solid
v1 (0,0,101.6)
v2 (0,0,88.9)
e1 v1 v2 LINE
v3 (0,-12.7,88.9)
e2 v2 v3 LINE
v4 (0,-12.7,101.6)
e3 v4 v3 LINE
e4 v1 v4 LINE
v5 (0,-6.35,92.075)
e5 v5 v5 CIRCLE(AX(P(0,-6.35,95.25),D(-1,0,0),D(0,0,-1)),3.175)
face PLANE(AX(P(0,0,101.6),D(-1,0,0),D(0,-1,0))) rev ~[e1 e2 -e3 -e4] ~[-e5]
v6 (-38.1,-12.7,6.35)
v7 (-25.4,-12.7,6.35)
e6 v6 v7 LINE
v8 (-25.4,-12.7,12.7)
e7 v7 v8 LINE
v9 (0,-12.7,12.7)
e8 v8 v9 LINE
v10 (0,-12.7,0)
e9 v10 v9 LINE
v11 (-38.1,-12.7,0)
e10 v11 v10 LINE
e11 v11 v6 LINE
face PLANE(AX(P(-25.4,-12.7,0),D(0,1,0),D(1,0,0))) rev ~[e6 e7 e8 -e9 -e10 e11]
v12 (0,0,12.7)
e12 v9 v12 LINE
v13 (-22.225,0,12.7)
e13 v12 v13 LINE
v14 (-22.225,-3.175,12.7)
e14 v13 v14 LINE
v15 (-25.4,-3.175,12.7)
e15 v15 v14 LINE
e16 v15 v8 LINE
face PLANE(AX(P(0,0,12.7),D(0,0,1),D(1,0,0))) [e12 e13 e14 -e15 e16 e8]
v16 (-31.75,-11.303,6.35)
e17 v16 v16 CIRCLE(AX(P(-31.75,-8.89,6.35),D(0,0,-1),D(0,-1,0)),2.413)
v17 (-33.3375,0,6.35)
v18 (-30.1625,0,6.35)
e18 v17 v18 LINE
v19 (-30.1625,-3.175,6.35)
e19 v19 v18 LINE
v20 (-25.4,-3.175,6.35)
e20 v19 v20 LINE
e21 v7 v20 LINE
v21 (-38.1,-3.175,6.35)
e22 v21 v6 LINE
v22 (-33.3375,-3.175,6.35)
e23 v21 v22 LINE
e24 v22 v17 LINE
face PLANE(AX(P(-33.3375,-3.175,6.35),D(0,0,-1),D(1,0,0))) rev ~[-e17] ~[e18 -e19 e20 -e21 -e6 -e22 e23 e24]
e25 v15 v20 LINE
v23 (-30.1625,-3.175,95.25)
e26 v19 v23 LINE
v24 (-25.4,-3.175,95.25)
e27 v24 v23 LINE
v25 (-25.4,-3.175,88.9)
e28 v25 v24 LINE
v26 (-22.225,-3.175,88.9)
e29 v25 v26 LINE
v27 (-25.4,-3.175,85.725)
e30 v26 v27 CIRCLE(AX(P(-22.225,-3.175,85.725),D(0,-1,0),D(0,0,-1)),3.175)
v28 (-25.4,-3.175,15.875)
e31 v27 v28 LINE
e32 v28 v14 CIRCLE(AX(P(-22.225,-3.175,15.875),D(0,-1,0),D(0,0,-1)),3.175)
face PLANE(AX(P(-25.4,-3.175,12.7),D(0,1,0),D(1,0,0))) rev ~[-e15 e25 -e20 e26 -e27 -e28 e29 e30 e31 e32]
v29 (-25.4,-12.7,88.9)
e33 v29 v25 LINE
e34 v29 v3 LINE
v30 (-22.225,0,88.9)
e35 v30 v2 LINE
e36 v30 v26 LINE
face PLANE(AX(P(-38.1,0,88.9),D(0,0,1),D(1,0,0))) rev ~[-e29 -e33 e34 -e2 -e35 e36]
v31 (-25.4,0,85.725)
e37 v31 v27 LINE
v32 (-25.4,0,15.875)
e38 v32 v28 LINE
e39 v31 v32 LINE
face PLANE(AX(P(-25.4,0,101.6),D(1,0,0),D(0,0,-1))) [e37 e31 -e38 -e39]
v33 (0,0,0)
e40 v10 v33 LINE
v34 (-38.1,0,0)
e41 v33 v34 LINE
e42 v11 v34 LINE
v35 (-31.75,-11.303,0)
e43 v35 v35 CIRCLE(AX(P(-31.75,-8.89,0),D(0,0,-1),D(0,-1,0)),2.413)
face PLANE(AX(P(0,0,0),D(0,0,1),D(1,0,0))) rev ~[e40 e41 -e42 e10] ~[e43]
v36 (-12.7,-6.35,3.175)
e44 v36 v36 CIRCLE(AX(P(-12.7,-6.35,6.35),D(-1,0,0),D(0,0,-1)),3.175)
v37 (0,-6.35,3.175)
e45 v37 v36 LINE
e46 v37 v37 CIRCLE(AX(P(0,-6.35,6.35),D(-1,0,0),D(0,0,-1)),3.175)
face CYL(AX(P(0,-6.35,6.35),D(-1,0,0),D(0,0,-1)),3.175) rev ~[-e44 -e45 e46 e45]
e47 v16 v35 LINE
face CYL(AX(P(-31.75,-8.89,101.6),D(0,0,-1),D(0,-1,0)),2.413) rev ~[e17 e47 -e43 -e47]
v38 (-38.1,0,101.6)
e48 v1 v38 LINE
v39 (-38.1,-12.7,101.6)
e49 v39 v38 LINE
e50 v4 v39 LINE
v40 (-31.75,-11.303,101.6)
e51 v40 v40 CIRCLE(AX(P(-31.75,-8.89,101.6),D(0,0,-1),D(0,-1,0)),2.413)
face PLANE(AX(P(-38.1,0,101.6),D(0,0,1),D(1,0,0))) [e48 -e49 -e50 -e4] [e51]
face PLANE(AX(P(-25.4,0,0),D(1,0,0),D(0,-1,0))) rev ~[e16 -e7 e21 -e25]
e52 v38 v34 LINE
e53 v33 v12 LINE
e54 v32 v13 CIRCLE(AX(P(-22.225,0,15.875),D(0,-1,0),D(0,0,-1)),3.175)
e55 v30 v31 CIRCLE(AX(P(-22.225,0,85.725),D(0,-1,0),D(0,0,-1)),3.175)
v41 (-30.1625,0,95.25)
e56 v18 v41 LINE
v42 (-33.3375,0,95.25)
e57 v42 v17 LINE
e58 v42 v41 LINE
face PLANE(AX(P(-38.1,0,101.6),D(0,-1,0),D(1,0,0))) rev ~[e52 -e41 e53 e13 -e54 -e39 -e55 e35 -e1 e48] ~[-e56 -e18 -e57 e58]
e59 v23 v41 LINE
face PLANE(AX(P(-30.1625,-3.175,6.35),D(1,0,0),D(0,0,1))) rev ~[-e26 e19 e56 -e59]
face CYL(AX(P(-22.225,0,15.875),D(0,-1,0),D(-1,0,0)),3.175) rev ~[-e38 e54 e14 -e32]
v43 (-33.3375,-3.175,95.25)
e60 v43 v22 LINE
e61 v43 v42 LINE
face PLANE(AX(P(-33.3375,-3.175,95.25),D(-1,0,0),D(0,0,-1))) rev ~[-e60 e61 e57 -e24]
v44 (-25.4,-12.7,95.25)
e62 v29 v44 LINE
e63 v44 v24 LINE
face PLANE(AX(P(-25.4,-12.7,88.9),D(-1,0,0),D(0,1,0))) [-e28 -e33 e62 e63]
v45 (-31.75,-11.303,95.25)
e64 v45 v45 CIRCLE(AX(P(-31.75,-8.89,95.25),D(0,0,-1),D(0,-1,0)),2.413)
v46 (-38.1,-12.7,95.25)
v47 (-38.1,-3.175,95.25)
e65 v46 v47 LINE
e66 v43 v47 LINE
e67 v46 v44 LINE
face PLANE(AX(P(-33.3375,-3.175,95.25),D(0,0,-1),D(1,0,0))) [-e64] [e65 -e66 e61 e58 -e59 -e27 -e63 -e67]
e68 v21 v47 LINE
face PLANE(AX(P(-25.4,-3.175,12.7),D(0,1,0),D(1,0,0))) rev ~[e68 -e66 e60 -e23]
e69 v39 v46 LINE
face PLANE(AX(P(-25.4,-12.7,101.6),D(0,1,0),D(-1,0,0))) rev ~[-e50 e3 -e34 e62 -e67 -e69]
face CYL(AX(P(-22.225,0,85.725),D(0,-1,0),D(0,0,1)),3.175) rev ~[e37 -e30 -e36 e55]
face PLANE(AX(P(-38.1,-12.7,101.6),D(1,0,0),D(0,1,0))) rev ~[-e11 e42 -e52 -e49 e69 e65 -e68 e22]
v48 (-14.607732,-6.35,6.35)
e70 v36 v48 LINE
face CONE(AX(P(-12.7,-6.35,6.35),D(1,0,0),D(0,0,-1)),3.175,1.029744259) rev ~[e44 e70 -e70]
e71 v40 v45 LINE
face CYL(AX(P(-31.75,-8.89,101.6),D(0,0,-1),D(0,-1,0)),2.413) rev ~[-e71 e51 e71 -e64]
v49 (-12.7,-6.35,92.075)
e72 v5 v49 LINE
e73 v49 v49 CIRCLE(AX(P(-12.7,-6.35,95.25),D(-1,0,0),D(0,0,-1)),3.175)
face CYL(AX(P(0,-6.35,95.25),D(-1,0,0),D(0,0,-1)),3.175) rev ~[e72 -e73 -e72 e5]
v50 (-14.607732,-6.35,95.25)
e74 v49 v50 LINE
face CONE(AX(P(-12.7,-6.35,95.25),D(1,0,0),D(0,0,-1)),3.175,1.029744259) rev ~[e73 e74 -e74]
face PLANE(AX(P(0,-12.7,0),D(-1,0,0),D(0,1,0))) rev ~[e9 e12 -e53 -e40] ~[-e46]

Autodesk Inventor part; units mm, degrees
ref_plane "YZ Plane" through (0, 0, 0) normal (1, 0, 0) x (0, 1, 0)
ref_plane "XZ Plane" through (0, 0, 0) normal (0, 1, 0) x (-1, 0, 0)
ref_plane "XY Plane" through (0, 0, 0) normal (0, 0, 1) x (1, 0, 0)
sketch "Sketch1" plane through (0, 0, 0) normal (0, 1, 0) x (-1, 0, 0)
  line L0 (0, 0) -> (38.1, 0)
  line L1 (38.1, 0) -> (38.1, 12.7)
  line L2 (38.1, 12.7) -> (0, 12.7)
  line L3 (0, 12.7) -> (0, 0)
  dimension "d0" = 38.1
  dimension "d1" = 12.7
sketch "Sketch2" plane through (0, 0, 0) normal (0, 0, 1) x (1, 0, 0)
  line L0 (0, 0) -> (-25.4, 0)
  line L1 (-25.4, 0) -> (-25.4, -12.7)
  line L2 (-25.4, -12.7) -> (0, -12.7)
  line L3 (0, -12.7) -> (0, 0)
  dimension "d2" = 25.4
  dimension "d3" = 12.7
extrude "Extrusion1" add sketch "Sketch2" along normal blind 12.7
sketch "Sketch3" plane through (0, 0, 0) normal (0, 0, -1) x (-1, 0, 0)
  line L0 (0, 0) -> (25.4, 0) projected
  line L1 (25.4, 0) -> (38.1, 0)
  line L2 (38.1, 0) -> (38.1, -12.7)
  line L3 (38.1, -12.7) -> (25.4, -12.7)
  line L4 (25.4, -12.7) -> (25.4, 0)
  dimension "d6" = 12.7
  dimension "d7" = 12.7
extrude "Extrusion2" add sketch "Sketch3" against normal blind 6.35
sketch "Sketch4" plane through (-25.4, 0, 12.7) normal (0, 1, 0) x (1, 0, 0)
  line L0 (-12.7, 12.7) -> (25.4, 12.7) projected
  line L1 (0, 12.7) -> (-12.7, 12.7)
  line L2 (-12.7, 12.7) -> (-12.7, -88.9)
  line L3 (-12.7, -88.9) -> (0, -88.9)
  line L4 (0, -88.9) -> (0, 12.7)
  dimension "d10" = 101.6
extrude "Extrusion3" add sketch "Sketch4" against normal blind 3.175
sketch "Sketch5" plane through (-25.4, -3.175, 12.7) normal (0, -1, 0) x (1, 0, 0)
  point P0 (25.4, -12.7)
sketch "Sketch6" plane through (-38.1, 0, 101.6) normal (0, 0, 1) x (1, 0, 0)
  line L0 (12.7, -12.7) -> (38.1, -12.7) projected
  line L1 (0, 0) -> (38.1, 0)
  line L2 (38.1, 0) -> (38.1, -12.7)
  line L3 (38.1, -12.7) -> (0, -12.7)
  line L4 (0, -12.7) -> (0, 0)
extrude "Extrusion4" add sketch "Sketch6" against normal blind 12.7
sketch "Sketch7" plane through (-38.1, 0, 88.9) normal (0, 0, -1) x (-1, 0, 0)
  line L0 (0, -12.7) -> (0, -3.175) projected
  line L1 (-12.7, -3.175) -> (0, -3.175) projected
  line L2 (0, -12.7) -> (-12.7, -12.7)
  line L3 (-12.7, -12.7) -> (-12.7, -3.175)
  line L4 (-12.7, -3.175) -> (0, -3.175)
  line L5 (0, -3.175) -> (0, -12.7)
  point P0 (-38.1, 0)
extrude "Extrusion5" cut sketch "Sketch7" against normal blind 6.35
fillet "Fillet1" radius 3.175 2 edges at (-25.4, -1.5875, 12.7) (-25.4, -1.5875, 88.9)
sketch "Sketch8" plane through (-38.1, -12.7, 101.6) normal (0, 0, 1) x (1, 0, 0)
  point P0 (38.1, 12.7)
  point P1 (6.35, 3.81)
hole "Hole1" at (-31.75, -8.89, 101.6) direction (0, 0, -1) diameter 4.826 depth 107.95 tip angle 118
sketch "Sketch9" plane through (-25.4, -3.175, 12.7) normal (0, -1, 0) x (1, 0, 0)
  line L0 (-12.7, 82.55) -> (0, 82.55) projected
  line L1 (-4.7625, 82.55) -> (-7.9375, 82.55)
  line L2 (-7.9375, 82.55) -> (-7.9375, -6.35)
  line L3 (-7.9375, -6.35) -> (-4.7625, -6.35)
  line L4 (-4.7625, -6.35) -> (-4.7625, 82.55)
  point P0 (25.4, -12.7)
  point P1 (-6.35, 0)
  dimension "d25" = 3.175
  dimension "d26" = 88.9
extrude "Extrusion6" cut sketch "Sketch9" against normal blind 6.35
sketch "Sketch10" plane through (0, -12.7, 101.6) normal (1, 0, 0) x (0, 0, -1)
  line L0 (95.25, 9.525) -> (95.25, 0) projected
  point P0 (101.6, 12.7)
  point P1 (6.35, 6.35)
  point P2 (95.25, 6.35)
hole "Hole2" at (0, -6.35, 6.35) at (0, -6.35, 95.25) direction (-1, 0, 0) diameter 6.35 depth 12.7 tip angle 118
properties part number "CarBrake"
